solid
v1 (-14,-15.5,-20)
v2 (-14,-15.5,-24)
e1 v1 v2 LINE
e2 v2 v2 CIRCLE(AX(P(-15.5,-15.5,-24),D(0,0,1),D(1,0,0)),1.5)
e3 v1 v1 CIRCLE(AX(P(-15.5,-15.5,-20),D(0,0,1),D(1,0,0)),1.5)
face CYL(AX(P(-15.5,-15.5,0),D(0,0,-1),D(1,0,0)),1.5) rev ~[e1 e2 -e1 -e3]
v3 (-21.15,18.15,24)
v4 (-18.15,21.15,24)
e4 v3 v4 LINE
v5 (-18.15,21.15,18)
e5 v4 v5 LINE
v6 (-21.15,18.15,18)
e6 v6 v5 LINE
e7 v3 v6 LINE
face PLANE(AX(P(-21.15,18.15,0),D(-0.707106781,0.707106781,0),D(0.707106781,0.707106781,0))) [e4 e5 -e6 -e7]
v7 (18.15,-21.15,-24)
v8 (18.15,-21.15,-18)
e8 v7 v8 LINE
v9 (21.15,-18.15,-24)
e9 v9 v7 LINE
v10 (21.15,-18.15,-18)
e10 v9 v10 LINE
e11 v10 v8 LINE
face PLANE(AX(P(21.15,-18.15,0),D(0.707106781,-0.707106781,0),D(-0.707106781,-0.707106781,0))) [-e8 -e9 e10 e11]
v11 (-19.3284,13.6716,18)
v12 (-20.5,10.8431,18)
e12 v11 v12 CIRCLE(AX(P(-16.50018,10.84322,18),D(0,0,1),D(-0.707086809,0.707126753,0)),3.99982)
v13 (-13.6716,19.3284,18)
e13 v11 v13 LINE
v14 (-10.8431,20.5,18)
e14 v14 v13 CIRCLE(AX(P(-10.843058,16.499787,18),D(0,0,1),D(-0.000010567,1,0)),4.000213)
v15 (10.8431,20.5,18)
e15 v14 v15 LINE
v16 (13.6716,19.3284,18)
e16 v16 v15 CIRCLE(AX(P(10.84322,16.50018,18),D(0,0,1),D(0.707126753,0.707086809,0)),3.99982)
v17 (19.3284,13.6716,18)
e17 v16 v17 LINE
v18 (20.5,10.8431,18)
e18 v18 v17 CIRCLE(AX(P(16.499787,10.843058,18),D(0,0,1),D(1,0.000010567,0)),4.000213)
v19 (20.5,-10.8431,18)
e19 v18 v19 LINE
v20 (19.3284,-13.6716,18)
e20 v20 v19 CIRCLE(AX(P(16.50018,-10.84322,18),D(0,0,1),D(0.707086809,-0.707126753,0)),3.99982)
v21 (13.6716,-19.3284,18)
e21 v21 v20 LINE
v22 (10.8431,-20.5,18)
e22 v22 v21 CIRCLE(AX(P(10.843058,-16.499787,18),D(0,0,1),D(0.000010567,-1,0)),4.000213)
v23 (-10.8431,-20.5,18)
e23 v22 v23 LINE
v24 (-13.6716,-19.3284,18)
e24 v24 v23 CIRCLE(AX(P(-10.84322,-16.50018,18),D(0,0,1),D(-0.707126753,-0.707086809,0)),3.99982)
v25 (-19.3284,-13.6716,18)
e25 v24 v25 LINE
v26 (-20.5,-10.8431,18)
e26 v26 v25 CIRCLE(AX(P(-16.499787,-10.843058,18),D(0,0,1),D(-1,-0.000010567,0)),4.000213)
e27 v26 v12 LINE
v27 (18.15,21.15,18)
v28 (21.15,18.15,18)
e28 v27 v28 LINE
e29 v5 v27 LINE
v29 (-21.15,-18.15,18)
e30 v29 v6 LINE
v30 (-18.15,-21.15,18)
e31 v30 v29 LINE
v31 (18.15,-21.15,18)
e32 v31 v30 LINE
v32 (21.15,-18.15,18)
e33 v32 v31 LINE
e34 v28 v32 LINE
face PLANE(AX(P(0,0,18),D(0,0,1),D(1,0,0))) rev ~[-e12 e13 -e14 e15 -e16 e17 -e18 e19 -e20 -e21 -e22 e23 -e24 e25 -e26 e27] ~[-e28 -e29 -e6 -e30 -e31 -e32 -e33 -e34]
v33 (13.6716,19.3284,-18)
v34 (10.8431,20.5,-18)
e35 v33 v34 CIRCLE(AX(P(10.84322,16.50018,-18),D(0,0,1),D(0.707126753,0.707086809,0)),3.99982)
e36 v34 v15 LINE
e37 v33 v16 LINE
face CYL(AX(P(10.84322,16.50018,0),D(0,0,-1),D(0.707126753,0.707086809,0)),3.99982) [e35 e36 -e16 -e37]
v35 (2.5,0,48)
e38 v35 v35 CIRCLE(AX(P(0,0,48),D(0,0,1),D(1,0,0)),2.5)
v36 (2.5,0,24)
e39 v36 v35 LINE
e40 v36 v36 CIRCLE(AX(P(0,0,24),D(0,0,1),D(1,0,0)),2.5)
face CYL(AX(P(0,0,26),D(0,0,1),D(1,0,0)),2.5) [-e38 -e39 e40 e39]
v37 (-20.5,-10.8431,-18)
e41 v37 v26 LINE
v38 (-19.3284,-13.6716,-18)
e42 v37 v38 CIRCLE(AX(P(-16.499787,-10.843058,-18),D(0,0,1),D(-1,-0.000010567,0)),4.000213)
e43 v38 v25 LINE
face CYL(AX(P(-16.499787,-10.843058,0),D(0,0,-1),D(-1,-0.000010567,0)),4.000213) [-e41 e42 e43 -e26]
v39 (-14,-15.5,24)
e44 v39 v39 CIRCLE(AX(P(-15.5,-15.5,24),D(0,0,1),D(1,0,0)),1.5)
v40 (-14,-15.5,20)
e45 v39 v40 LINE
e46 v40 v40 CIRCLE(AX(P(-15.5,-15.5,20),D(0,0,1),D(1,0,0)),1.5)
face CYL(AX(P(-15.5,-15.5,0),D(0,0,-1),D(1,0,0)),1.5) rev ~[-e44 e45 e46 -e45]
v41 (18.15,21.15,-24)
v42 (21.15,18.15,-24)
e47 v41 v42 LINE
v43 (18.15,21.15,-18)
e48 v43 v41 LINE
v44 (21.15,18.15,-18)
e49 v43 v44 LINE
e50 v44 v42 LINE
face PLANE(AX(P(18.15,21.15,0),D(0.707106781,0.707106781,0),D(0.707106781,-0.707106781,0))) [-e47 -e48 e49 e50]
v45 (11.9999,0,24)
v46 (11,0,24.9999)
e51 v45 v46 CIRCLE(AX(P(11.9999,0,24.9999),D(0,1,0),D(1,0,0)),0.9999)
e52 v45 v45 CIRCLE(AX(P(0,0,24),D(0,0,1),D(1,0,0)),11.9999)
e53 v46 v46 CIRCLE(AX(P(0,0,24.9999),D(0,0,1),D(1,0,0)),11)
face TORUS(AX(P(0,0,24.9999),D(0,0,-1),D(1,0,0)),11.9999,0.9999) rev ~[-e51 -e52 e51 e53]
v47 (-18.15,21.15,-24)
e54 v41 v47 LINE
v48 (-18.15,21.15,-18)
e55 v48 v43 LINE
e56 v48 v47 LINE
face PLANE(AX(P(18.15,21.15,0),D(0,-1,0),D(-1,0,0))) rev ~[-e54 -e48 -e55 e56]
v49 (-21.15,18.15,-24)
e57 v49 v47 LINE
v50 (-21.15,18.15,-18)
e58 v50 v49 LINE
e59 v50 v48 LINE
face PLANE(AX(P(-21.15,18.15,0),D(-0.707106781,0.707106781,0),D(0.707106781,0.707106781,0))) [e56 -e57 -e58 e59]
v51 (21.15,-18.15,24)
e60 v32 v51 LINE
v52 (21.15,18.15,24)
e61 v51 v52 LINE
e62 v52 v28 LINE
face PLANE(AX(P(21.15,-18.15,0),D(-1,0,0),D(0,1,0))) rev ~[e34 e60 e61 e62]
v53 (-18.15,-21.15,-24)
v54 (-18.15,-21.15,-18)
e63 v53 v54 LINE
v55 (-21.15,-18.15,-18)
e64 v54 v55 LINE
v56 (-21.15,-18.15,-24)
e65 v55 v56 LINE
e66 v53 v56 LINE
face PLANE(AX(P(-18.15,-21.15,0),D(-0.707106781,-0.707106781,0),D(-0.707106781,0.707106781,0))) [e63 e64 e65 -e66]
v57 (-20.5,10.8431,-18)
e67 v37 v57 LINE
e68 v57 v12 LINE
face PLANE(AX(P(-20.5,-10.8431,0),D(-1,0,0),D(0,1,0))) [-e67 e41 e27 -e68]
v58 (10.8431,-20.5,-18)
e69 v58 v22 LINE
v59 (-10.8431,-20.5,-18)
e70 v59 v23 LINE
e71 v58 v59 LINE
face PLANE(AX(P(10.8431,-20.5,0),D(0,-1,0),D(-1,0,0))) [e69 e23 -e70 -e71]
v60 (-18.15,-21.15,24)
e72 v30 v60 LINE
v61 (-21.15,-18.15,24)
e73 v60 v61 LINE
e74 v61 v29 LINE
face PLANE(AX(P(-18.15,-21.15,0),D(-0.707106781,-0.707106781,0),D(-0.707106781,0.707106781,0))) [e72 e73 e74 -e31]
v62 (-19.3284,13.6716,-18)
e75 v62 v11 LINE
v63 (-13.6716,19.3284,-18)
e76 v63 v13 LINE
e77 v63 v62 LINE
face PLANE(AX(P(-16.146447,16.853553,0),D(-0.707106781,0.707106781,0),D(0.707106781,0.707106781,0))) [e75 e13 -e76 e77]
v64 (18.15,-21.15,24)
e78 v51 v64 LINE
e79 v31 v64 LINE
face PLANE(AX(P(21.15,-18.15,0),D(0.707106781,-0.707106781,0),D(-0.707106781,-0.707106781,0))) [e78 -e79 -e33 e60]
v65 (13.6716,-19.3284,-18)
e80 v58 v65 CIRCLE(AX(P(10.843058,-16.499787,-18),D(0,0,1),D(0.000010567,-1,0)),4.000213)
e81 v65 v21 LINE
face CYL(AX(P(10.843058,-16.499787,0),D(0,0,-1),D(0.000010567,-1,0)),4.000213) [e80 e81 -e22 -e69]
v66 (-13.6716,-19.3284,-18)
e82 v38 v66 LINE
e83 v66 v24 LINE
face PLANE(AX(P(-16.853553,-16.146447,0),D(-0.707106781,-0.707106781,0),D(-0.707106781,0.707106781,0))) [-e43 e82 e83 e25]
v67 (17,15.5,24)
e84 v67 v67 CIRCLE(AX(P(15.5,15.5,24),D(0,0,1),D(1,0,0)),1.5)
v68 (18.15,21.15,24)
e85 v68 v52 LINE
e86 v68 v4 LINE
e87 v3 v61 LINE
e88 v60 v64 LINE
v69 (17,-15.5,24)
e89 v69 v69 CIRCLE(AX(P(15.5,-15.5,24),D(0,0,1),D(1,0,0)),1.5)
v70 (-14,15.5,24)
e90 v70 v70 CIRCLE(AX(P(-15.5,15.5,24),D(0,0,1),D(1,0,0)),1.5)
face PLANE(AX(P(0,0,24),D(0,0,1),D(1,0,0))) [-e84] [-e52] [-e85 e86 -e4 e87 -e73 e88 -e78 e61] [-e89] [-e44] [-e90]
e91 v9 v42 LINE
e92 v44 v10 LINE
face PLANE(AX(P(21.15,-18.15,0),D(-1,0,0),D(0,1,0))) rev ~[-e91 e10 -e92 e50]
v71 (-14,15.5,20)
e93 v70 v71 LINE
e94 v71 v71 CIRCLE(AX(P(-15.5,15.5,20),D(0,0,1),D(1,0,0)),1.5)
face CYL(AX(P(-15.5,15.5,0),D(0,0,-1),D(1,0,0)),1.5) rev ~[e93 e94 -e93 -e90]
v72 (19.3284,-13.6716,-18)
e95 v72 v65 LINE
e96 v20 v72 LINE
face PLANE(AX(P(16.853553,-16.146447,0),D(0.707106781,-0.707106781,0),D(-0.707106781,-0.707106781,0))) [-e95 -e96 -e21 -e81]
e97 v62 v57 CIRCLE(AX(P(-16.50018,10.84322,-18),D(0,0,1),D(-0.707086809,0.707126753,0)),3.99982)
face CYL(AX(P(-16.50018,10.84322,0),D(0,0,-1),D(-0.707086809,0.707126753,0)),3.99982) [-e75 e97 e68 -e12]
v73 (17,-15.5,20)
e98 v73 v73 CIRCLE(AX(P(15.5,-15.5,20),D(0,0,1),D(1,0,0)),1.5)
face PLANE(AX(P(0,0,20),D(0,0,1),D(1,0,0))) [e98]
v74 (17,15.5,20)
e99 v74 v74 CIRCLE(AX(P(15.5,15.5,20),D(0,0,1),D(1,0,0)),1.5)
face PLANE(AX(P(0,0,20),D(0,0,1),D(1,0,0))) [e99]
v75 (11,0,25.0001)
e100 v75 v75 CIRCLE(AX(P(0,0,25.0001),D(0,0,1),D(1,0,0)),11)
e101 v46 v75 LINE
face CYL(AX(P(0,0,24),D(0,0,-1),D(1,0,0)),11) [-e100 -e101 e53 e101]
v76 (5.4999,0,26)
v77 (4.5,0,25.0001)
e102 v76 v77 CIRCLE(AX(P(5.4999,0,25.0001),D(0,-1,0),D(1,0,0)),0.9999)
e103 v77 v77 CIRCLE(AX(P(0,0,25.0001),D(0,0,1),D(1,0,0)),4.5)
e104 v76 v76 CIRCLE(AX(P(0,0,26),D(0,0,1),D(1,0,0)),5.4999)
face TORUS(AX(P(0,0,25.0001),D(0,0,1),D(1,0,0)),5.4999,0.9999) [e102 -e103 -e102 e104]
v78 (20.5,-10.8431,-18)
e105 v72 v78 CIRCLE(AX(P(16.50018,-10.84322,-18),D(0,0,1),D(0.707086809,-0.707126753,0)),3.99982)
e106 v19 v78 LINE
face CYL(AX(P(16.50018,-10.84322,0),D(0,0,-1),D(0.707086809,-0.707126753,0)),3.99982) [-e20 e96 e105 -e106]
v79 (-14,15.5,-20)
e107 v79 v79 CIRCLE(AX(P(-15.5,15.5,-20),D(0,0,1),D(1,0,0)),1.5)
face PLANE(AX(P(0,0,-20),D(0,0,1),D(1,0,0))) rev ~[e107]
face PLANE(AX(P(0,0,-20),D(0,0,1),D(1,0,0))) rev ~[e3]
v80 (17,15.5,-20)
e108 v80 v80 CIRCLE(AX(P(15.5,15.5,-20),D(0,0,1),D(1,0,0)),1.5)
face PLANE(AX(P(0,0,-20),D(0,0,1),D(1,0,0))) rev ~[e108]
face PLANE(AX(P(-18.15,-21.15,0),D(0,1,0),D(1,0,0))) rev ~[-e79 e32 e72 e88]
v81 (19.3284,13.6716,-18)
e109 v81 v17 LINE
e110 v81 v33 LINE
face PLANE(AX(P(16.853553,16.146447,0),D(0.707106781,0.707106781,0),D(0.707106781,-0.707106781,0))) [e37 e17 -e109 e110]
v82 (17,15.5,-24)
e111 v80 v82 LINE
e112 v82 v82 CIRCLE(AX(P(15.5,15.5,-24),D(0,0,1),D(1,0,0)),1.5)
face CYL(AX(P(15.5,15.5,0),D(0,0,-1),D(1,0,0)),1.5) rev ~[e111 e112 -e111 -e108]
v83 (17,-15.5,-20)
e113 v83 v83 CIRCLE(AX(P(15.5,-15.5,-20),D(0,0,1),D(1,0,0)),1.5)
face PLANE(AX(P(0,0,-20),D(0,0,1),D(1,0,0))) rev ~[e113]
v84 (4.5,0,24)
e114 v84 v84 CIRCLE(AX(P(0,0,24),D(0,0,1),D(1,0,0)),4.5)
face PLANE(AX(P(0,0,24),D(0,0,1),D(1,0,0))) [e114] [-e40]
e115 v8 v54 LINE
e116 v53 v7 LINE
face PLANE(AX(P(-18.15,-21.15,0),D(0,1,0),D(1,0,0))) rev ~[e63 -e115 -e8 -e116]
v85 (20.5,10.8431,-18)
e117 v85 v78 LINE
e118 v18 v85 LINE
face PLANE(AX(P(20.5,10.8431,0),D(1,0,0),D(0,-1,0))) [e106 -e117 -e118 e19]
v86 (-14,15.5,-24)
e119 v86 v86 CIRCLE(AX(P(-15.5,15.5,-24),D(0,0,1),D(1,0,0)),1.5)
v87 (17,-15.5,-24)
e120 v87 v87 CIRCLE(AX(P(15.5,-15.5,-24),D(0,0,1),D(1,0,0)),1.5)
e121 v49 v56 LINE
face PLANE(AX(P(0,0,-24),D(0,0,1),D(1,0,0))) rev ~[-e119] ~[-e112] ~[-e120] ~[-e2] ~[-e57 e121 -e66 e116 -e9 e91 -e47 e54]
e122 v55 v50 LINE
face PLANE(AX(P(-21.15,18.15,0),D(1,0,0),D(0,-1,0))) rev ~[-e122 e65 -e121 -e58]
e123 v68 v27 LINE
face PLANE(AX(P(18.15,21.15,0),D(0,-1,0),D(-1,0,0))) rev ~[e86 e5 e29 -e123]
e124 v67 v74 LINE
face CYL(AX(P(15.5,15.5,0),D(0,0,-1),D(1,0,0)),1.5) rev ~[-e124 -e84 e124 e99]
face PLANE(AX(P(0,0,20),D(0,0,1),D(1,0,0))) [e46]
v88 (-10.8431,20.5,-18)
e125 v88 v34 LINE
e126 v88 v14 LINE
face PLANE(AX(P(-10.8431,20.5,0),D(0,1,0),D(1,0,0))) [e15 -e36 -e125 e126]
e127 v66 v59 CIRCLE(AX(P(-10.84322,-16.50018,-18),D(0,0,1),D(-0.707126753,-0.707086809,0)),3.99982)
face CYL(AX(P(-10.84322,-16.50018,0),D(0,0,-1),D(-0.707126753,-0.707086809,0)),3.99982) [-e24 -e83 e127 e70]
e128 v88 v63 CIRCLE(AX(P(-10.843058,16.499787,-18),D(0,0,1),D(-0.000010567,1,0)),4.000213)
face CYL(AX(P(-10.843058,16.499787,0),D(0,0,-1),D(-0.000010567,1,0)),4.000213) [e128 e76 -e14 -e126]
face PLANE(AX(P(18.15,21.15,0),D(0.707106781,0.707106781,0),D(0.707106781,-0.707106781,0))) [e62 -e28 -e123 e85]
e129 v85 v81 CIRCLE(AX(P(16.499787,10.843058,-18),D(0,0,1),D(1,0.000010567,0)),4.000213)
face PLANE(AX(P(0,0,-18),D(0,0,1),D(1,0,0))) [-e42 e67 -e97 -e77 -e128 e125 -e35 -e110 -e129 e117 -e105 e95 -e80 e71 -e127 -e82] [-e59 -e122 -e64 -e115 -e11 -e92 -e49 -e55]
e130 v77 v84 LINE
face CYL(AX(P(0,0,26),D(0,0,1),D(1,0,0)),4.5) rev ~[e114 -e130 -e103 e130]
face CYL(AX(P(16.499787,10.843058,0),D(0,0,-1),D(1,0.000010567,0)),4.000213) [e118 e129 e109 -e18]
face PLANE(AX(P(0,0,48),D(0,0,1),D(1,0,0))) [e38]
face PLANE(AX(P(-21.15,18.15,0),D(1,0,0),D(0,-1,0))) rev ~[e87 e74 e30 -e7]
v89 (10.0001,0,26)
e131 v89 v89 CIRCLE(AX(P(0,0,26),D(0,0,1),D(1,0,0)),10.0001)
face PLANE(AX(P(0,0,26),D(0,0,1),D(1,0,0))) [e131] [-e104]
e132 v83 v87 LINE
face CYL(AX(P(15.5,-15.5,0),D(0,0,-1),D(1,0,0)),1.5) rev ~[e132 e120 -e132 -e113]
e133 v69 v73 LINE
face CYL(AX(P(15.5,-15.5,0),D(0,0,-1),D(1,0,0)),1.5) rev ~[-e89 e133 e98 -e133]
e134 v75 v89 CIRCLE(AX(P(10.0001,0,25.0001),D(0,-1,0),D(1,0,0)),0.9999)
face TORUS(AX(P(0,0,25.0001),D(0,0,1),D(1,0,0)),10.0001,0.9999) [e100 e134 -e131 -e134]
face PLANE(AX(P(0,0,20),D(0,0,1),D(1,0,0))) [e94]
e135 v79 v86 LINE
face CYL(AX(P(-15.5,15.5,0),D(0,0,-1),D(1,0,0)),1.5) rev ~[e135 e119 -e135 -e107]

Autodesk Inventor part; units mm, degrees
ref_plane "YZ Plane" through (0, 0, 0) normal (1, 0, 0) x (0, 1, 0)
ref_plane "XZ Plane" through (0, 0, 0) normal (0, 1, 0) x (-1, 0, 0)
ref_plane "XY Plane" through (0, 0, 0) normal (0, 0, 1) x (1, 0, 0)
sketch "Sketch1" plane through (0, 0, 0) normal (0, 0, 1) x (1, 0, 0)
  line L0 (-18.15, -21.15) -> (18.15, -21.15)
  line L1 (21.15, -18.15) -> (21.15, 18.15)
  line L2 (18.15, 21.15) -> (-18.15, 21.15)
  line L3 (-21.15, 18.15) -> (-21.15, -18.15)
  line L4 (-21.15, -21.15) -> (21.15, 21.15) construction
  line L5 (21.15, -21.15) -> (-21.15, 21.15) construction
  line L6 (-21.15, 18.15) -> (-18.15, 21.15)
  line L7 (18.15, 21.15) -> (21.15, 18.15)
  line L8 (21.15, -18.15) -> (18.15, -21.15)
  line L9 (-18.15, -21.15) -> (-21.15, -18.15)
  line L10 (-15.5, -15.5) -> (15.5, -15.5) construction
  line L11 (15.5, -15.5) -> (15.5, 15.5) construction
  line L12 (15.5, 15.5) -> (-15.5, 15.5) construction
  line L13 (-15.5, 15.5) -> (-15.5, -15.5) construction
  line L14 (-15.5, -15.5) -> (15.5, 15.5) construction
  line L15 (15.5, -15.5) -> (-15.5, 15.5) construction
  circle A0 centre (-15.5, 15.5) radius 1.5
  circle A1 centre (15.5, 15.5) radius 1.5
  circle A2 centre (15.5, -15.5) radius 1.5
  circle A3 centre (-15.5, -15.5) radius 1.5
  point P0 (0, 0)
  dimension "d0" = 42.3
  dimension "d1" = 42.3
  dimension "d2" = 3
  dimension "d3" = 3
  dimension "d4" = 3
  dimension "d5" = 3
  dimension "d6" = 3
  dimension "d7" = 3
  dimension "d8" = 3
  dimension "d9" = 3
  dimension "d10" = 31
  dimension "d11" = 31
  dimension "d12" = 3
  dimension "d13" = 3
  dimension "d14" = 3
  dimension "d15" = 3
extrude "Extrusion1" add sketch "Sketch1" along normal mid plane 48
sketch "Sketch2" plane through (0, 0, 0) normal (0, 0, 1) x (1, 0, 0)
  circle A0 centre (-15.5, 15.5) radius 1.5 projected
  circle A1 centre (15.5, 15.5) radius 1.5 projected
  circle A2 centre (15.5, -15.5) radius 1.5 projected
  circle A3 centre (-15.5, -15.5) radius 1.5 projected
  point P0 (0, 0)
extrude "Extrusion2" add sketch "Sketch2" along normal mid plane 40
sketch "Sketch3" plane through (0, 0, 0) normal (0, 0, 1) x (1, 0, 0)
  line L0 (10.8431, -20.5) -> (-10.8431, -20.5)
  line L1 (-20.5, -10.8431) -> (-20.5, 10.8431)
  line L2 (-10.8431, 20.5) -> (10.8431, 20.5)
  line L3 (20.5, 10.8431) -> (20.5, -10.8431)
  line L4 (20.5, -20.5) -> (-20.5, 20.5) construction
  line L5 (-20.5, -20.5) -> (20.5, 20.5) construction
  line L6 (-19.3284, 13.6716) -> (-13.6716, 19.3284)
  line L7 (13.6716, 19.3284) -> (19.3284, 13.6716)
  line L8 (19.3284, -13.6716) -> (13.6716, -19.3284)
  line L9 (-13.6716, -19.3284) -> (-19.3284, -13.6716)
  arc A0 (-10.8431, 20.5) -> (-13.6716, 19.3284) centre (-10.8431, 16.5) ccw
  arc A1 (-19.3284, 13.6716) -> (-20.5, 10.8431) centre (-16.5, 10.8431) ccw
  arc A2 (13.6716, 19.3284) -> (10.8431, 20.5) centre (10.8431, 16.5) ccw
  arc A3 (20.5, 10.8431) -> (19.3284, 13.6716) centre (16.5, 10.8431) ccw
  arc A4 (19.3284, -13.6716) -> (20.5, -10.8431) centre (16.5, -10.8431) ccw
  arc A5 (10.8431, -20.5) -> (13.6716, -19.3284) centre (10.8431, -16.5) ccw
  arc A6 (-13.6716, -19.3284) -> (-10.8431, -20.5) centre (-10.8431, -16.5) ccw
  arc A7 (-20.5, -10.8431) -> (-19.3284, -13.6716) centre (-16.5, -10.8431) ccw
  line L10 (-21.15, 18.15) -> (-18.15, 21.15) projected
  line L11 (-18.15, 21.15) -> (18.15, 21.15) projected
  line L12 (18.15, 21.15) -> (21.15, 18.15) projected
  line L13 (21.15, 18.15) -> (21.15, -18.15) projected
  line L14 (21.15, -18.15) -> (18.15, -21.15) projected
  line L15 (18.15, -21.15) -> (-18.15, -21.15) projected
  line L16 (-18.15, -21.15) -> (-21.15, -18.15) projected
  line L17 (-21.15, -18.15) -> (-21.15, 18.15) projected
  circle A8 centre (-15.5, 15.5) radius 1.5 projected
  circle A9 centre (15.5, 15.5) radius 1.5 projected
  circle A10 centre (15.5, -15.5) radius 1.5 projected
  circle A11 centre (-15.5, -15.5) radius 1.5 projected
  point P0 (0, 0)
  point P1 (-20.5, 12.5)
  point P2 (-12.5, 20.5)
  point P3 (12.5, 20.5)
  point P4 (20.5, 12.5)
  point P5 (20.5, -12.5)
  point P6 (12.5, -20.5)
  point P7 (-12.5, -20.5)
  point P8 (-20.5, -12.5)
  point P9 (-11.3431, -21.15)
  point P10 (-21.15, -11.4931)
  point P11 (11.3431, -21.15)
  point P12 (21.15, -11.4931)
  point P13 (21.15, 11.4931)
  point P14 (11.3431, 21.15)
  point P15 (-11.3431, 21.15)
  point P16 (-21.15, 11.4931)
  dimension "d20" = 41
  dimension "d21" = 41
  dimension "d22" = 8
  dimension "d23" = 8
  dimension "d24" = 8
  dimension "d25" = 8
  dimension "d26" = 8
  dimension "d27" = 8
  dimension "d28" = 8
  dimension "d29" = 8
  dimension "d30" = 4
extrude "Extrusion3" cut sketch "Sketch3" along normal mid plane 36 contours L8 A10 | A11 L9 | L7 A9 | A8 L6 | L10 L11 L12 L13 L14 L15 L16 L17 picked at (16.5579, -16.478) picked at (-16.478, -16.5579) picked at (16.5579, 16.478) picked at (-16.5579, 16.478)
sketch "Sketch4" plane through (0, 0, 24) normal (0, 0, 1) x (1, 0, 0)
  circle A0 centre (0, 0) radius 11
  dimension "d33" = 22
extrude "Extrusion4" add sketch "Sketch4" along normal blind 2
sketch "Sketch5" plane through (0, 0, 26) normal (0, 0, 1) x (1, 0, 0)
  circle A0 centre (0, 0) radius 2.5
  dimension "d36" = 5
extrude "Extrusion5" add sketch "Sketch5" along normal blind 22
sketch "Sketch6" plane through (0, 0, 26) normal (0, 0, 1) x (1, 0, 0)
  circle A0 centre (0, 0) radius 2.5 projected
  circle A1 centre (0, 0) radius 4.5
  dimension "d39" = 2
extrude "Extrusion6" cut sketch "Sketch6" against normal blind 2
fillet "Fillet1" radius 1 3 edges at (-11, 0, 24) (-4.5, 0, 26) (-11, 0, 26)
equation "\"d3\" = d2"
equation "\"d4\" = d2"
equation "\"d5\" = d4"
equation "\"d6\" = d2"
equation "\"d7\" = d6"
equation "\"d8\" = d2"
equation "\"d9\" = d8"
equation "\"d23\" = d22"
equation "\"d24\" = d22"
equation "\"d25\" = d24"
equation "\"d26\" = d22"
equation "\"d27\" = d26"
equation "\"d28\" = d22"
equation "\"d29\" = d28"
properties part number "3217_Stepper Motor_V1" material "Stainless Steel, Brushed"
